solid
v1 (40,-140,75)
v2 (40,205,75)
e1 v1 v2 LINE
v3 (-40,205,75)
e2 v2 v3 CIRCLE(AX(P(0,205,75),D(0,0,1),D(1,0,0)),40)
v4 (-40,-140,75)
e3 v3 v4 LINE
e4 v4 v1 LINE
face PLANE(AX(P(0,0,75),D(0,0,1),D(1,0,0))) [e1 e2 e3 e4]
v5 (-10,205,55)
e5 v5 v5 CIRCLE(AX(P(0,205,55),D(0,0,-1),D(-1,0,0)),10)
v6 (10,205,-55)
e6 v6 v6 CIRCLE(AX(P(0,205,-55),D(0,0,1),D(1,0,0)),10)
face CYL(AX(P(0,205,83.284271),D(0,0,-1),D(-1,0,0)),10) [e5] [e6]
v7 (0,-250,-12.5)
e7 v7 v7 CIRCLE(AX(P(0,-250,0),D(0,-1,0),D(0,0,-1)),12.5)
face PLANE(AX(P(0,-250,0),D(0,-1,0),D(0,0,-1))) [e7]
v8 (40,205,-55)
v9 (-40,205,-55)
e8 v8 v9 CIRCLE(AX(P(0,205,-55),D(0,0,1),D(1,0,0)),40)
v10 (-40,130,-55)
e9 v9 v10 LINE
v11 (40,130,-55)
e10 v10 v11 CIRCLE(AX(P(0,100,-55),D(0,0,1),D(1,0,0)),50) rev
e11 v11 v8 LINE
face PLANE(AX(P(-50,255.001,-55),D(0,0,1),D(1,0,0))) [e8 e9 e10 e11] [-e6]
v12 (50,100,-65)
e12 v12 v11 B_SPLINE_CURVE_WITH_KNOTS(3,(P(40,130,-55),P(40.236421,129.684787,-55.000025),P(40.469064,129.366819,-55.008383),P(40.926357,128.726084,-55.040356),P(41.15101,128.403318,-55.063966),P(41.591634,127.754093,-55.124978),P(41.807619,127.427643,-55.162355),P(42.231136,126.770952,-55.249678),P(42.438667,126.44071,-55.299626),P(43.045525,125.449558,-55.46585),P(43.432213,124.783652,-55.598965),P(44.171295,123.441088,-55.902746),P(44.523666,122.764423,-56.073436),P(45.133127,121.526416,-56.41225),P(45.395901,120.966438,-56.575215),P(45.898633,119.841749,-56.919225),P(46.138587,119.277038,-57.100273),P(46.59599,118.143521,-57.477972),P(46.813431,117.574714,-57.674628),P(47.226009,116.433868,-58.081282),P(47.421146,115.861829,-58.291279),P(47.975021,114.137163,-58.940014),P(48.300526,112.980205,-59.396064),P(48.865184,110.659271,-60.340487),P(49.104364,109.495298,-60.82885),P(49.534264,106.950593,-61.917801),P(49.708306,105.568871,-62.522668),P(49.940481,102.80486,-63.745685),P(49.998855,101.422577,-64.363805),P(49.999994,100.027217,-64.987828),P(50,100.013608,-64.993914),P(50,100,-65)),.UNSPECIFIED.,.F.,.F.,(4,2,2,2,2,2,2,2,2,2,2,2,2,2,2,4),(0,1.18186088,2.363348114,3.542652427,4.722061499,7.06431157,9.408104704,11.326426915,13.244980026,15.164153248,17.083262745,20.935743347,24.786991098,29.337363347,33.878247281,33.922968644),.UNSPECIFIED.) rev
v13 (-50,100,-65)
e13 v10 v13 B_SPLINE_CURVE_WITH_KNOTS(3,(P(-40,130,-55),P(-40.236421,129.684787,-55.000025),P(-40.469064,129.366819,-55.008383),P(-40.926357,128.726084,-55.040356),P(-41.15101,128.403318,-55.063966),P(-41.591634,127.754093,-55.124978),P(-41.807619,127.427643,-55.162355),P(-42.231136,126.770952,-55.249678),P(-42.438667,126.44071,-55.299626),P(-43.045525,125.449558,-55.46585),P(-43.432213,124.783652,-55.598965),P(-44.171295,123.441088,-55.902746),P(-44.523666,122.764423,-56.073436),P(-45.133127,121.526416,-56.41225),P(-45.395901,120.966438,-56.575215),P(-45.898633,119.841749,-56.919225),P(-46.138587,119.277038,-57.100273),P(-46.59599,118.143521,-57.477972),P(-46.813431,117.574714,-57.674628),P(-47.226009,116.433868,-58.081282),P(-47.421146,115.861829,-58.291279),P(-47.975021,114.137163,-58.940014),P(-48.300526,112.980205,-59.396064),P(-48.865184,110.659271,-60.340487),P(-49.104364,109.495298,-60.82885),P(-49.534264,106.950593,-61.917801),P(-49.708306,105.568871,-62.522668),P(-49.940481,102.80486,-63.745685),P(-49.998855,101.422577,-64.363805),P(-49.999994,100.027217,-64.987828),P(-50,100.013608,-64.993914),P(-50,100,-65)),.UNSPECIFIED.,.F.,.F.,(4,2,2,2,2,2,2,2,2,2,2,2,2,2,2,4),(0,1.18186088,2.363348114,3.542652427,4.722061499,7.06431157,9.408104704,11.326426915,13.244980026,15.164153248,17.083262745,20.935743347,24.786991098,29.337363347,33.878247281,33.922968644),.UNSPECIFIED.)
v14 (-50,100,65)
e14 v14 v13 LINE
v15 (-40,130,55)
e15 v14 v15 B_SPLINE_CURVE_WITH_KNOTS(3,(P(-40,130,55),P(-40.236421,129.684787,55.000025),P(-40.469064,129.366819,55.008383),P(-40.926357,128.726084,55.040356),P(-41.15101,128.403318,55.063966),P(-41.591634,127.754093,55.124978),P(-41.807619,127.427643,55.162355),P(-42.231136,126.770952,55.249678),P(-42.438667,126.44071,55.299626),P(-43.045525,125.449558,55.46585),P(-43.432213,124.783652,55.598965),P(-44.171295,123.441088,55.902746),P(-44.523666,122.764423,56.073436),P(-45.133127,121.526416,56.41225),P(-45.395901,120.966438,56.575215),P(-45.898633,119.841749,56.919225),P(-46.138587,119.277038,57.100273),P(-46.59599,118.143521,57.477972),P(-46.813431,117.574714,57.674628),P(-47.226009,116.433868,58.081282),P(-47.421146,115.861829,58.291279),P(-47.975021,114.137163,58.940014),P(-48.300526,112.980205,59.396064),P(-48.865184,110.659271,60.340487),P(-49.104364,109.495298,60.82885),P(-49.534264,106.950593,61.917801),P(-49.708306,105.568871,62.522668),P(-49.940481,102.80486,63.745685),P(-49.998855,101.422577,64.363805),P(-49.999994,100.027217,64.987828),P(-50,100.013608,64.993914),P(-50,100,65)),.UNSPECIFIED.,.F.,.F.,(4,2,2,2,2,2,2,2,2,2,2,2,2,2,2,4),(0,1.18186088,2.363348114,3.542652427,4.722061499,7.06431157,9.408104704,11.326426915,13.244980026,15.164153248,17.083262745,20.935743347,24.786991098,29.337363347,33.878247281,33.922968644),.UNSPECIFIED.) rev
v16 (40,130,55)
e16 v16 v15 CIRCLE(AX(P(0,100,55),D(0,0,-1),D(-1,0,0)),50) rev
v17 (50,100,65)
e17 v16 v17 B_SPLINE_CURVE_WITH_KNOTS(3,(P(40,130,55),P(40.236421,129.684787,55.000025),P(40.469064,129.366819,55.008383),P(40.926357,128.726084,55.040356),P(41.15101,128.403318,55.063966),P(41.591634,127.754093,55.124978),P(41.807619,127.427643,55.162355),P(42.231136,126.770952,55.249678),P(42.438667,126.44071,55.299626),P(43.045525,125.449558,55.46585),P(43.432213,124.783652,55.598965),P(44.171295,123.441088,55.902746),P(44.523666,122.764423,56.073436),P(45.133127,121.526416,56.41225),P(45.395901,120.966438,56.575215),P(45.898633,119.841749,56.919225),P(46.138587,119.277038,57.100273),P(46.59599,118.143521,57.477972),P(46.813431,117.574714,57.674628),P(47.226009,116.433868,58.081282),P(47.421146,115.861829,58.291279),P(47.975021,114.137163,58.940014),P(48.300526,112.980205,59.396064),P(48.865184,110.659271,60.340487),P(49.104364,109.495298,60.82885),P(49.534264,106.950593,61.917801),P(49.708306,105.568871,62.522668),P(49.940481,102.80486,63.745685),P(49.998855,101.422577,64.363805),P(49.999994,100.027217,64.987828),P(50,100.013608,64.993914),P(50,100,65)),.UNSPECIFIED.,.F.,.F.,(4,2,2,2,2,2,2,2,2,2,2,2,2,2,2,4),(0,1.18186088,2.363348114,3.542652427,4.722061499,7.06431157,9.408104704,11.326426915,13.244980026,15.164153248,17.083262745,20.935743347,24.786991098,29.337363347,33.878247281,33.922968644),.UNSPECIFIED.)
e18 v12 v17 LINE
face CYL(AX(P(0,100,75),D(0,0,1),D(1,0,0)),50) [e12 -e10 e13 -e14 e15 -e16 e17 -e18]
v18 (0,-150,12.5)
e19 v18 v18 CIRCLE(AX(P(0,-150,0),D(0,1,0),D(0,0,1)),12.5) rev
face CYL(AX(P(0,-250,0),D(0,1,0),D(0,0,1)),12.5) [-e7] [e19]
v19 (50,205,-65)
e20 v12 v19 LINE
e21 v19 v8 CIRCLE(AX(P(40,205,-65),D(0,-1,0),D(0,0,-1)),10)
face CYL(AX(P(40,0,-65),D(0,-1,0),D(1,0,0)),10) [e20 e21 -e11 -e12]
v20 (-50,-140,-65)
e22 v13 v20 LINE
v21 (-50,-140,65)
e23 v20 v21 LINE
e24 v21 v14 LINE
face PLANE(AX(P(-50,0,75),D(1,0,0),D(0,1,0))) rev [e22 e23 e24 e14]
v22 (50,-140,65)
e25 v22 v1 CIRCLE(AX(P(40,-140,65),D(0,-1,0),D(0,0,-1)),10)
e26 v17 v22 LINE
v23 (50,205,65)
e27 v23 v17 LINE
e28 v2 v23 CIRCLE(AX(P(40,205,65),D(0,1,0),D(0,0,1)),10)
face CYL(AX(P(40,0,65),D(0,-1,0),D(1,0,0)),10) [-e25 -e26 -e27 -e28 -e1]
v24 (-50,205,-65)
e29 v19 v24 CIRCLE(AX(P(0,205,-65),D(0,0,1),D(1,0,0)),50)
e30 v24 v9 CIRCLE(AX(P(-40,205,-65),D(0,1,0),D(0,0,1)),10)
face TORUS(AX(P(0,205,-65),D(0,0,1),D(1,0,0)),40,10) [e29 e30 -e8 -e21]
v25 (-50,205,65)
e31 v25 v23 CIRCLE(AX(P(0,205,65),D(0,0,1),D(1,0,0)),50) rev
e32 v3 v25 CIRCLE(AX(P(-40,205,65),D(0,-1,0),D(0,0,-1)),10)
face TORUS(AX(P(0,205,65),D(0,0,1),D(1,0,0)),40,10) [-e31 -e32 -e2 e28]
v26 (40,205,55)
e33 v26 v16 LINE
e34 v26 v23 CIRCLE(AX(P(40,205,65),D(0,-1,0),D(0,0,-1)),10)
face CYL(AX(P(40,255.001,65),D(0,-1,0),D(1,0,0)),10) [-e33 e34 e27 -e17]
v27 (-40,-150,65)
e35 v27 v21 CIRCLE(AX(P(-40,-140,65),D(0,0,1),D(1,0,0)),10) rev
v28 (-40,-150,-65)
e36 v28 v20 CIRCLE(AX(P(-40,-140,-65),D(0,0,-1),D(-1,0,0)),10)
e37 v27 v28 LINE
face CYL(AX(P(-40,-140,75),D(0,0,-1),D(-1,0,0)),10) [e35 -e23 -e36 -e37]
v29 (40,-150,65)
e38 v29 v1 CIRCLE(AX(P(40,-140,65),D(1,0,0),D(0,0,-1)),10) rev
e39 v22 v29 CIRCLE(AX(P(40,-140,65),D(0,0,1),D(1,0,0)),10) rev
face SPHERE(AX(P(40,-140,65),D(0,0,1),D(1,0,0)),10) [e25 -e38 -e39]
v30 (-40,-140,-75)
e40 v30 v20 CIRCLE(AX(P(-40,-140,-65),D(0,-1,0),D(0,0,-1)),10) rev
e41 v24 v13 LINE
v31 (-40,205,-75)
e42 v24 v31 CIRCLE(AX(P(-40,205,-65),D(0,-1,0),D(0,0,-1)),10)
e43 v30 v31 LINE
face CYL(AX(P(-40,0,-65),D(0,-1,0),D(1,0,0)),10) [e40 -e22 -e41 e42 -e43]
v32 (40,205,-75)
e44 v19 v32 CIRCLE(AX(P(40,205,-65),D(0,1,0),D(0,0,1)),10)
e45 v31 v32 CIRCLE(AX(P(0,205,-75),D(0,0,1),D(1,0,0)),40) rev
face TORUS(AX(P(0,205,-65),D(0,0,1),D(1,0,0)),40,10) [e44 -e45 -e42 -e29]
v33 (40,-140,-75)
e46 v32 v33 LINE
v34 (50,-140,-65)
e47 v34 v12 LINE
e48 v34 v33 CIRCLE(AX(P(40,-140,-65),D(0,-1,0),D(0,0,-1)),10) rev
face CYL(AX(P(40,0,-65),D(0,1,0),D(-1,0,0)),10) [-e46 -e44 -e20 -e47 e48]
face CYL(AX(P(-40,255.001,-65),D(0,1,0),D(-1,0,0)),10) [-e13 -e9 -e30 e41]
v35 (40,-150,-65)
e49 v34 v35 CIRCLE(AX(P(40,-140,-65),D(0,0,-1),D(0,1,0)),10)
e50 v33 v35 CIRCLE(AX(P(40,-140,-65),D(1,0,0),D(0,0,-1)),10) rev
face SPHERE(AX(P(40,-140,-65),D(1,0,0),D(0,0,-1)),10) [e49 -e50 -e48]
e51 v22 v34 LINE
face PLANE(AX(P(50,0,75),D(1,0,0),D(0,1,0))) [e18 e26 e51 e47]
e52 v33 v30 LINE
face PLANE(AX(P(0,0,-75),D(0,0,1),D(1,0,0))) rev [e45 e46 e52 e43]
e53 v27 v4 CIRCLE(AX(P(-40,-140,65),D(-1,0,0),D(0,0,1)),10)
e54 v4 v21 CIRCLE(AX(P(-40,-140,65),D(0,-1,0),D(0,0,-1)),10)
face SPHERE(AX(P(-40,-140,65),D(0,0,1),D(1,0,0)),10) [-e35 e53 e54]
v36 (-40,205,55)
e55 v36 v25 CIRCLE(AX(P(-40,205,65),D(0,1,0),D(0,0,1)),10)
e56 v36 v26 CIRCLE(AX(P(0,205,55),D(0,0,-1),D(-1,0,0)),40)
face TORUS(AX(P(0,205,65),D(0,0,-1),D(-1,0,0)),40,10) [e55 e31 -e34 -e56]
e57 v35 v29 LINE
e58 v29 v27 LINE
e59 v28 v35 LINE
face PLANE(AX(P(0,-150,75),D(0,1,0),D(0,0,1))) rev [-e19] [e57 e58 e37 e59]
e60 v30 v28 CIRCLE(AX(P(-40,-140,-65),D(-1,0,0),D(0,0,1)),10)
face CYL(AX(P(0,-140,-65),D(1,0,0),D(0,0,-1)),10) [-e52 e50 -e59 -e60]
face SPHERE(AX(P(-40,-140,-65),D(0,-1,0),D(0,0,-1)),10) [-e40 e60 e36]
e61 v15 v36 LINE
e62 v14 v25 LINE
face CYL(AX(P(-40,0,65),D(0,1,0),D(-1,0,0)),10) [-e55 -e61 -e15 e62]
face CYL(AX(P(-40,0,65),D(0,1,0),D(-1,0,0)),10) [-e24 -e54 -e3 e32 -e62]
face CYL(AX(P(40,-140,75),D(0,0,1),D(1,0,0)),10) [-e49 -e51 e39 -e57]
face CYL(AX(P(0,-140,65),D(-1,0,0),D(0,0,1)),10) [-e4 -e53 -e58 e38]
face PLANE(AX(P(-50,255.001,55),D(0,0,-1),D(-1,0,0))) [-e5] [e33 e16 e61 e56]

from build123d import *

# Parameters (mm, degrees)
SKETCH2_W           = 100
SKETCH2_H           = 300
BOSS_EXTRUDE1_DEPTH = 75
CUT_EXTRUDE1_REACH  = 422.463
CUT_EXTRUDE1_START  = 150
SKETCH3_W           = 100
SKETCH3_H           = 110
SKETCH4_R           = 10
BOSS_EXTRUDE2_DEPTH = 110
SKETCH5_R           = 12.5
BOSS_EXTRUDE3_DEPTH = 100
FILLET1_RADIUS      = 50
FILLET1_LENGTH      = 110
FILLET2_R           = 10
FILLET3_R           = 10


with BuildPart() as part:
    # Sketch2 → Boss-Extrude1 (new, symmetric)
    with BuildSketch(Plane.XY):
        Rectangle(SKETCH2_W, SKETCH2_H)
        with BuildLine():
            ThreePointArc((-50, 205), (0, 255), (50, 205))
            Line((50, 205), (50, 150))
            Line((50, 150), (-50, 150))
            Line((-50, 150), (-50, 205))
        make_face()
    extrude(amount=BOSS_EXTRUDE1_DEPTH, both=True)

    # Sketch3 → Cut-Extrude1 (cut, up to next)
    with BuildSketch(Plane(origin=(0, 0, 0), x_dir=(1, 0, 0), z_dir=(0, 1, 0)).offset(CUT_EXTRUDE1_START), mode=Mode.PRIVATE) as cut_extrude1_sk1:
        Rectangle(SKETCH3_W, SKETCH3_H)
    cut_extrude1_tool1 = extrude(cut_extrude1_sk1.sketch, amount=CUT_EXTRUDE1_REACH, mode=Mode.PRIVATE) & part.part
    add(cut_extrude1_tool1.solids().sort_by_distance((0, 150, 0))[0], mode=Mode.SUBTRACT)

    # Sketch4 → Boss-Extrude2 (add)
    with BuildSketch(Plane.XY.offset(-55)):
        with Locations(Location((0, 205, 0), (0, 0, 180))):
            Circle(SKETCH4_R)
    extrude(amount=BOSS_EXTRUDE2_DEPTH)

    # Sketch5 → Boss-Extrude3 (add)
    with BuildSketch(Plane.XZ.offset(150)):
        with Locations(Location((0, 0, 0), (0, 0, 90))):
            Circle(SKETCH5_R)
    extrude(amount=BOSS_EXTRUDE3_DEPTH)

    # Fillet1: full round fillet: the end face becomes a half cylinder, R = half its width
    fillet1_face = Plane((0, 150, 0), x_dir=(0, 0, -1), z_dir=(0, 1, 0))  # on the end face: x along it, z out of the body
    fillet1_slab = fillet1_face.offset(-FILLET1_RADIUS / 2) * Box(FILLET1_LENGTH, 2 * FILLET1_RADIUS, FILLET1_RADIUS, mode=Mode.PRIVATE)  # the body's end, R deep
    fillet1_round = Plane((0, 100, 0), x_dir=(0, 1, 0), z_dir=(0, 0, -1)) * Cylinder(FILLET1_RADIUS, FILLET1_LENGTH, mode=Mode.PRIVATE)  # its axis R under the face
    add(fillet1_slab - fillet1_round, mode=Mode.SUBTRACT)

    # Fillet2
    fillet2_edges = [part.edges().sort_by_distance(p)[0] for p in [
        (0, 255, 75),
        (-50, 27.5, 75),
        (0, -150, 75),
        (50, 27.5, 75),
        (0, -150, -75),
        (-50, 27.5, -75),
        (0, 255, -75),
        (50, 27.5, -75),
        (50, -150, 0),
        (-50, -150, 0),
    ]]
    fillet(fillet2_edges, radius=FILLET2_R)

    # Fillet3
    fillet3_edges = [part.edges().sort_by_distance(p)[0] for p in [
        (50, 152.5, 55),
        (0, 255, 55),
        (50, 152.5, -55),
        (0, 255, -55),
        (-50, 152.5, 55),
        (-50, 152.5, -55),
    ]]
    fillet(fillet3_edges, radius=FILLET3_R - 0.0001)  # a hair under: the kernel refuses the full size


solid = part.part
